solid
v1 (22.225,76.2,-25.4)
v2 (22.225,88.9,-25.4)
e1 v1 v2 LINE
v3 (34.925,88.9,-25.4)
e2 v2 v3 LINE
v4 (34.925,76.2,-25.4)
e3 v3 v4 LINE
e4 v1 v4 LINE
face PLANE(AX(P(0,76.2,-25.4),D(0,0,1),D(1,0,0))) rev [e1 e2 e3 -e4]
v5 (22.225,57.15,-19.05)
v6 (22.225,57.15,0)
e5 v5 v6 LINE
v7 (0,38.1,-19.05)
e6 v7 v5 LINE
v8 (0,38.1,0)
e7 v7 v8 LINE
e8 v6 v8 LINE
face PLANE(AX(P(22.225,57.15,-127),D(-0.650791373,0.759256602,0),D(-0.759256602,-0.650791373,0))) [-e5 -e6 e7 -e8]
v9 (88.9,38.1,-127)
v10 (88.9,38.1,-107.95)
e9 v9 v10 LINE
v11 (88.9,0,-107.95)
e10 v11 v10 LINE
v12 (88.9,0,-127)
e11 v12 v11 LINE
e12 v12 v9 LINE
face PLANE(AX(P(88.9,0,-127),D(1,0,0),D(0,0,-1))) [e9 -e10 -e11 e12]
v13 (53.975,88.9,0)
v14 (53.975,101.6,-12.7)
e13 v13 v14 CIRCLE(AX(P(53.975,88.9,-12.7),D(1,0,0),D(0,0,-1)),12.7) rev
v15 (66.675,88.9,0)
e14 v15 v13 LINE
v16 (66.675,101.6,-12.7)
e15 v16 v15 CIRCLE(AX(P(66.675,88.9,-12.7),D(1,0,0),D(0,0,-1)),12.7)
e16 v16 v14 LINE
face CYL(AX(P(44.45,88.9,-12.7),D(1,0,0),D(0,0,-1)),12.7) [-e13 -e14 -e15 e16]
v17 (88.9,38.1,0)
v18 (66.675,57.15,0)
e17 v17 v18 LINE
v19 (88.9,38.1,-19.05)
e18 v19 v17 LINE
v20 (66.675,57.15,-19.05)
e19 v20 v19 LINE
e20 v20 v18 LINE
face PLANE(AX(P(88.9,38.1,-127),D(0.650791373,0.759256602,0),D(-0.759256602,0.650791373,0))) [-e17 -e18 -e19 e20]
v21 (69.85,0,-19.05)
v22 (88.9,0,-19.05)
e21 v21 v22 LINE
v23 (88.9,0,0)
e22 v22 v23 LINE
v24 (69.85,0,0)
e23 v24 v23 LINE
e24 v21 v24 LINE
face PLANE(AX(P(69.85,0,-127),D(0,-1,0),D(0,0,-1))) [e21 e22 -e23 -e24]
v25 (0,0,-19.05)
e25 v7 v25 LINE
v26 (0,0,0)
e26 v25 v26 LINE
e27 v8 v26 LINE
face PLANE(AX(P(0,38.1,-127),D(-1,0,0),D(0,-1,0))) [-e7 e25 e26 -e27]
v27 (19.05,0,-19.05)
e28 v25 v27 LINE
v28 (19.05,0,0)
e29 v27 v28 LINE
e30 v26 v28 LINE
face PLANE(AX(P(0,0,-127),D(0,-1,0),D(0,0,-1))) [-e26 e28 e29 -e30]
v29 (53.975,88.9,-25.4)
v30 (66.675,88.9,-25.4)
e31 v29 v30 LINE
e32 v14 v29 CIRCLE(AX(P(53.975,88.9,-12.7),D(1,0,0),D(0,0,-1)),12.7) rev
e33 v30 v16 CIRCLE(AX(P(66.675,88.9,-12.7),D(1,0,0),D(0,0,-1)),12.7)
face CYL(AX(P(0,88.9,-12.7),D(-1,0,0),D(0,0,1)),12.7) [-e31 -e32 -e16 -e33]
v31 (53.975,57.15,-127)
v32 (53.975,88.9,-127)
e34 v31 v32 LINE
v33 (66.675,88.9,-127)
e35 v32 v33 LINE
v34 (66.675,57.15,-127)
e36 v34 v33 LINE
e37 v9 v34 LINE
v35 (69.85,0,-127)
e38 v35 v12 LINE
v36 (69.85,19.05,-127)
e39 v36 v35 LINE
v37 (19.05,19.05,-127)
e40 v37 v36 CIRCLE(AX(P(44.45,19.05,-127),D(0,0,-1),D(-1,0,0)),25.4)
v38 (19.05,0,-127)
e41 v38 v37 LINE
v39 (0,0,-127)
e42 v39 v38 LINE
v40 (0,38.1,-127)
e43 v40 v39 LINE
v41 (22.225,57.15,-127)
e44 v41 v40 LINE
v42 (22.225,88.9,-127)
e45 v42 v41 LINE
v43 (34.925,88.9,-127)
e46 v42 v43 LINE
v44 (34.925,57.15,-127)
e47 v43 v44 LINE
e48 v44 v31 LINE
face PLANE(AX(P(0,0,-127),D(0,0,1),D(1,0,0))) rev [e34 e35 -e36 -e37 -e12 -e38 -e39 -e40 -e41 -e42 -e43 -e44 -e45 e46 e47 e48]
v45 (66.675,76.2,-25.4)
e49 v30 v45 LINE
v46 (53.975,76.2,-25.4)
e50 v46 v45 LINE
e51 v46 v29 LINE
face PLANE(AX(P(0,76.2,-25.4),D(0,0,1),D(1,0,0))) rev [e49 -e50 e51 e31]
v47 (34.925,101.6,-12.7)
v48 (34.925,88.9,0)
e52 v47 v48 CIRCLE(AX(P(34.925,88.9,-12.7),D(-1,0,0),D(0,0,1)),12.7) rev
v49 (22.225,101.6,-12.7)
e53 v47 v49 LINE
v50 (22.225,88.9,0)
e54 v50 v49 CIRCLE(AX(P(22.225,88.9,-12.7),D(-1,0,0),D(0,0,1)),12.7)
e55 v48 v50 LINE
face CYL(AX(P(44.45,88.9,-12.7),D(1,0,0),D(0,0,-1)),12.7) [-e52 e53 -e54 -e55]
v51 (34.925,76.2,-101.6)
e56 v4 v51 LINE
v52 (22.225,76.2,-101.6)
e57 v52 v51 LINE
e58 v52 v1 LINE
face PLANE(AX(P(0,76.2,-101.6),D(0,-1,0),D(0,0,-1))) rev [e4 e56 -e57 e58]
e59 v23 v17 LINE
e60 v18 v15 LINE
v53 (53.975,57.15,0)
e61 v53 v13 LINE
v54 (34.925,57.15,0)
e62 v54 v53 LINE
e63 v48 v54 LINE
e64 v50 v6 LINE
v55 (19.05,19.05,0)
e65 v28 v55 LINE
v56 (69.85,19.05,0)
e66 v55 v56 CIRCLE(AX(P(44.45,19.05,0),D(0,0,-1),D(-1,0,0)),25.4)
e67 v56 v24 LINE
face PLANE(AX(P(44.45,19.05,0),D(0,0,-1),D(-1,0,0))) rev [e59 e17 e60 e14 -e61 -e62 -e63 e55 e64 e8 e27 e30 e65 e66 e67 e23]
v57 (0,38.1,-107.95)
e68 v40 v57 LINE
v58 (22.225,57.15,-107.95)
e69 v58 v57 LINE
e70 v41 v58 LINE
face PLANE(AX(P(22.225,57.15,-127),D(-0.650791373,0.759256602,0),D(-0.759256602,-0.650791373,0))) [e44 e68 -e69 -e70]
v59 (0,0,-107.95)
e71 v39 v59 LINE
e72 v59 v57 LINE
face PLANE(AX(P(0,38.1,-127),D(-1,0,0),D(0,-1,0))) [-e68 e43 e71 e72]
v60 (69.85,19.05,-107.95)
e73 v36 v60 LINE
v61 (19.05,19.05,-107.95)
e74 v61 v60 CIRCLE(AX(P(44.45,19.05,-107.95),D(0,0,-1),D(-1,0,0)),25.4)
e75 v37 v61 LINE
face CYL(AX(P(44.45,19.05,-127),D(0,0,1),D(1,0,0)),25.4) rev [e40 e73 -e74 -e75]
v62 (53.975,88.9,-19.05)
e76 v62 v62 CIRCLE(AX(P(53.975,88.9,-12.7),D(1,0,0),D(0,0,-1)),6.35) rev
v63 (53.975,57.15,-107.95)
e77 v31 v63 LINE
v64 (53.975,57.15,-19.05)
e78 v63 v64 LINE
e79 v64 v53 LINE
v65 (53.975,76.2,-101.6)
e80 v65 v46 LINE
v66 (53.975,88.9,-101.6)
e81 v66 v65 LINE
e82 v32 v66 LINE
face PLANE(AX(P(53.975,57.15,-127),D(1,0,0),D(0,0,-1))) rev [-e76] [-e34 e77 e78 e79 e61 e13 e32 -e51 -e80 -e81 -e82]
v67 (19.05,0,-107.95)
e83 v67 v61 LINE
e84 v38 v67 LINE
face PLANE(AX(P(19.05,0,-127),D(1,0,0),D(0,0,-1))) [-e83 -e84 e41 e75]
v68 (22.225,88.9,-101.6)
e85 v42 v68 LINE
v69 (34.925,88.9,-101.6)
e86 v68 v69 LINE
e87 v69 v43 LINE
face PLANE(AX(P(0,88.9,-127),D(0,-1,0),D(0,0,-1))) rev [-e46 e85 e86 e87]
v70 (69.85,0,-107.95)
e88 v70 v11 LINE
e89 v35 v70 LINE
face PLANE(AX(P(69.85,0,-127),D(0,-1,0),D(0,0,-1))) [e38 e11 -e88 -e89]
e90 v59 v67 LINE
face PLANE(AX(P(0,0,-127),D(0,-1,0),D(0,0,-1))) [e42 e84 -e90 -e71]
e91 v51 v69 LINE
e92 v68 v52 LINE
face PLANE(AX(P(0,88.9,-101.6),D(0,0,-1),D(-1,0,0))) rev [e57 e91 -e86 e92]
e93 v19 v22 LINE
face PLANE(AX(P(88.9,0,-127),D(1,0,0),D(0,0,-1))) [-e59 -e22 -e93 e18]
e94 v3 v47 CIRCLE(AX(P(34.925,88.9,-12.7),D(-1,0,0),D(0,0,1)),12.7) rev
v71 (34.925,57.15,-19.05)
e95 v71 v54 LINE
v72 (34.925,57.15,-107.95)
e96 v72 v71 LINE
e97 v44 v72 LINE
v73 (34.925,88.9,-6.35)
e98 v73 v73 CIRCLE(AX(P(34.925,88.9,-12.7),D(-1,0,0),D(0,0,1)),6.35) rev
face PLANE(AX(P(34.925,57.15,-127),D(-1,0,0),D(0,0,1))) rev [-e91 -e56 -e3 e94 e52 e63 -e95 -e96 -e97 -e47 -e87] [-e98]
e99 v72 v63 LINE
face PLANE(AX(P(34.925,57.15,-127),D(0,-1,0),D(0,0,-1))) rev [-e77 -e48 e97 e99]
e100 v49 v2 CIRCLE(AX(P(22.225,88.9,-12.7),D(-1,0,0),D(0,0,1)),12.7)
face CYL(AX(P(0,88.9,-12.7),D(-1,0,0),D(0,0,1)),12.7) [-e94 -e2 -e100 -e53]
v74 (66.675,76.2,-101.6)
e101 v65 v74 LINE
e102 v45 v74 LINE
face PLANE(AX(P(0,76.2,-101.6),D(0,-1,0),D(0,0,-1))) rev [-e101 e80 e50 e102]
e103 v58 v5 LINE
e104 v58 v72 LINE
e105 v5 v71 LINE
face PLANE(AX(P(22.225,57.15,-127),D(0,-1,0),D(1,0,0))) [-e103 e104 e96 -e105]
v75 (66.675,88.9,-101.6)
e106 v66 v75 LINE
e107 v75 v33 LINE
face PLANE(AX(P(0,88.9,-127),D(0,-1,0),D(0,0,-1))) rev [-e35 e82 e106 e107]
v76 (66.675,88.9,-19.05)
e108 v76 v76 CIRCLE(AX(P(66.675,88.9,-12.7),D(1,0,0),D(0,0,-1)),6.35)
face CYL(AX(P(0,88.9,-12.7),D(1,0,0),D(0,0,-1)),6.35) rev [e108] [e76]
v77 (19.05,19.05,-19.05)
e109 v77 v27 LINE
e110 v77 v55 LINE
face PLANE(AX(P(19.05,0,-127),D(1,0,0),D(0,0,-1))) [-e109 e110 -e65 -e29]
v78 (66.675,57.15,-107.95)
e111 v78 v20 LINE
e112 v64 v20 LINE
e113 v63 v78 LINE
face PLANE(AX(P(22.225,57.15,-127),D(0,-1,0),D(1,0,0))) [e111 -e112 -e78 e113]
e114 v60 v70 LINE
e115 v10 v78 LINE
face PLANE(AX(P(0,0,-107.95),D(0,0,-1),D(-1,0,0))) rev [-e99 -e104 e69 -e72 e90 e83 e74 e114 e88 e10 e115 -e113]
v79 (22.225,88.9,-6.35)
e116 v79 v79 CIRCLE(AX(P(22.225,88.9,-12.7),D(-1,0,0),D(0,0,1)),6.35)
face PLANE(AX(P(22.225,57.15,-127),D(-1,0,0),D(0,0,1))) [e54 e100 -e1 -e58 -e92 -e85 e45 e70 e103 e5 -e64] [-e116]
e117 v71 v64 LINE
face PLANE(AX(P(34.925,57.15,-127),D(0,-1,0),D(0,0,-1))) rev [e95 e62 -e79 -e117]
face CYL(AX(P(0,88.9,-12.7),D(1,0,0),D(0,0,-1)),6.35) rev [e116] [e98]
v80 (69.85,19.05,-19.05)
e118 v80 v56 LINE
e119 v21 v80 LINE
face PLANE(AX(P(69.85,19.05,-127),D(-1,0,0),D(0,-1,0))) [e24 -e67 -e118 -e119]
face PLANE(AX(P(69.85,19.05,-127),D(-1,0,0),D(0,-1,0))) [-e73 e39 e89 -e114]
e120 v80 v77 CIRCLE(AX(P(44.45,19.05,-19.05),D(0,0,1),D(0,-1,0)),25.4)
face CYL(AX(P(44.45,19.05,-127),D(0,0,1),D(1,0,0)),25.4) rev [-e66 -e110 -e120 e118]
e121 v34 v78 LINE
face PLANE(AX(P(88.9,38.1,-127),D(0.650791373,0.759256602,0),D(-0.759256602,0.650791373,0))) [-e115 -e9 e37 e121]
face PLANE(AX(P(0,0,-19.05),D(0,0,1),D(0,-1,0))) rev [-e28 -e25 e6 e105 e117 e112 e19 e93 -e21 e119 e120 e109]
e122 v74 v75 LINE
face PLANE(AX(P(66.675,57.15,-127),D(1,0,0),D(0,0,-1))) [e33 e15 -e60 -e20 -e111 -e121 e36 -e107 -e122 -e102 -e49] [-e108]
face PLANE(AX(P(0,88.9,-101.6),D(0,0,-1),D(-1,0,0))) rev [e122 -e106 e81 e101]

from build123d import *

# Parameters (mm, degrees)
BOSS_EXTRUDE1_DEPTH = 127
SKETCH3_W           = 88.9
SKETCH3_H           = 57.15
CUT_EXTRUDE1_DEPTH  = 166.222070257
SKETCH5_W           = 44.45
SKETCH5_H           = 44.45
BOSS_EXTRUDE2_DEPTH = 127
CUT_EXTRUDE2_DEPTH  = 176.775753803
FILLET1_R           = 12.7
SKETCH8_R           = 6.35
CUT_EXTRUDE3_DEPTH  = 176.775753803
SKETCH9_W           = 19.05
SKETCH9_H           = 44.45
CUT_EXTRUDE4_DEPTH  = 186.350397895


with BuildPart() as part:
    # Sketch2 → Boss-Extrude1 (new body)
    with BuildSketch(Plane.XY):
        with BuildLine():
            Line((0, 0), (19.05, 0))
            Line((19.05, 0), (19.05, 19.05))
            ThreePointArc((19.05, 19.05), (44.45, 44.45), (69.85, 19.05))
            Line((69.85, 19.05), (69.85, 0))
            Line((69.85, 0), (88.9, 0))
            Line((88.9, 0), (88.9, 38.1))
            Line((88.9, 38.1), (66.675, 57.15))
            Line((66.675, 57.15), (22.225, 57.15))
            Line((22.225, 57.15), (0, 38.1))
            Line((0, 38.1), (0, 0))
        make_face()
    extrude(amount=-BOSS_EXTRUDE1_DEPTH)

    # Sketch3 → Cut-Extrude1 (cut, through all)
    with BuildSketch(Plane(origin=(88.9, 0, 0), x_dir=(0, 0, -1), z_dir=(1, 0, 0))):
        with Locations((63.5, 28.575)):
            Rectangle(SKETCH3_W, SKETCH3_H)
    extrude(amount=-CUT_EXTRUDE1_DEPTH, mode=Mode.SUBTRACT)


with BuildPart() as cut_extrude1_piece_1:
    # of the separate pieces the step leaves, piece 1, a body of its own (cut_extrude1_pieces)
    add(part.part.solids().sort_by_distance((0, 0, 0))[0])



with BuildPart() as cut_extrude1_piece_2:
    # of the separate pieces the step leaves, piece 2, a body of its own (cut_extrude1_pieces)
    add(part.part.solids().sort_by_distance((19.05, 0, -107.95))[0])


with BuildPart() as cut_extrude1_piece_1_1:
    add(cut_extrude1_piece_1.part)

    add(cut_extrude1_piece_2.part)  # Boss-Extrude2 merges Cut-Extrude1 piece 2
    # Sketch5 → Boss-Extrude2 (add)
    with BuildSketch(Plane.XY):
        with Locations((44.45, 79.375)):
            Rectangle(SKETCH5_W, SKETCH5_H)
    extrude(amount=-BOSS_EXTRUDE2_DEPTH)

    # Sketch6 → Cut-Extrude2 (cut, through all)
    with BuildSketch(Plane(origin=(66.675, 0, 0), x_dir=(0, 0, -1), z_dir=(1, 0, 0))):
        Polygon((127, 88.9), (101.6, 88.9), (101.6, 76.2), (25.4, 76.2), (25.4, 101.6), (127, 101.6), align=None)
    extrude(amount=-CUT_EXTRUDE2_DEPTH, mode=Mode.SUBTRACT)

    # Fillet1
    fillet1_edges = [cut_extrude1_piece_1_1.edges().sort_by_distance(p)[0] for p in [
        (44.45, 101.6, -25.4),
        (44.45, 101.6, 0),
    ]]
    fillet(fillet1_edges, radius=FILLET1_R - 0.0001)  # a hair under: the kernel refuses the full size

    # Sketch8 → Cut-Extrude3 (cut, through all)
    with BuildSketch(Plane(origin=(66.675, 0, 0), x_dir=(0, 0, -1), z_dir=(1, 0, 0))):
        with Locations((12.7, 88.9)):
            Circle(SKETCH8_R)
    extrude(amount=-CUT_EXTRUDE3_DEPTH, mode=Mode.SUBTRACT)

    # Sketch9 → Cut-Extrude4 (cut, through all)
    with BuildSketch(Plane.XY):
        with Locations((44.45, 79.375)):
            Rectangle(SKETCH9_W, SKETCH9_H)
    extrude(amount=-CUT_EXTRUDE4_DEPTH, mode=Mode.SUBTRACT)


solid = cut_extrude1_piece_1_1.part
